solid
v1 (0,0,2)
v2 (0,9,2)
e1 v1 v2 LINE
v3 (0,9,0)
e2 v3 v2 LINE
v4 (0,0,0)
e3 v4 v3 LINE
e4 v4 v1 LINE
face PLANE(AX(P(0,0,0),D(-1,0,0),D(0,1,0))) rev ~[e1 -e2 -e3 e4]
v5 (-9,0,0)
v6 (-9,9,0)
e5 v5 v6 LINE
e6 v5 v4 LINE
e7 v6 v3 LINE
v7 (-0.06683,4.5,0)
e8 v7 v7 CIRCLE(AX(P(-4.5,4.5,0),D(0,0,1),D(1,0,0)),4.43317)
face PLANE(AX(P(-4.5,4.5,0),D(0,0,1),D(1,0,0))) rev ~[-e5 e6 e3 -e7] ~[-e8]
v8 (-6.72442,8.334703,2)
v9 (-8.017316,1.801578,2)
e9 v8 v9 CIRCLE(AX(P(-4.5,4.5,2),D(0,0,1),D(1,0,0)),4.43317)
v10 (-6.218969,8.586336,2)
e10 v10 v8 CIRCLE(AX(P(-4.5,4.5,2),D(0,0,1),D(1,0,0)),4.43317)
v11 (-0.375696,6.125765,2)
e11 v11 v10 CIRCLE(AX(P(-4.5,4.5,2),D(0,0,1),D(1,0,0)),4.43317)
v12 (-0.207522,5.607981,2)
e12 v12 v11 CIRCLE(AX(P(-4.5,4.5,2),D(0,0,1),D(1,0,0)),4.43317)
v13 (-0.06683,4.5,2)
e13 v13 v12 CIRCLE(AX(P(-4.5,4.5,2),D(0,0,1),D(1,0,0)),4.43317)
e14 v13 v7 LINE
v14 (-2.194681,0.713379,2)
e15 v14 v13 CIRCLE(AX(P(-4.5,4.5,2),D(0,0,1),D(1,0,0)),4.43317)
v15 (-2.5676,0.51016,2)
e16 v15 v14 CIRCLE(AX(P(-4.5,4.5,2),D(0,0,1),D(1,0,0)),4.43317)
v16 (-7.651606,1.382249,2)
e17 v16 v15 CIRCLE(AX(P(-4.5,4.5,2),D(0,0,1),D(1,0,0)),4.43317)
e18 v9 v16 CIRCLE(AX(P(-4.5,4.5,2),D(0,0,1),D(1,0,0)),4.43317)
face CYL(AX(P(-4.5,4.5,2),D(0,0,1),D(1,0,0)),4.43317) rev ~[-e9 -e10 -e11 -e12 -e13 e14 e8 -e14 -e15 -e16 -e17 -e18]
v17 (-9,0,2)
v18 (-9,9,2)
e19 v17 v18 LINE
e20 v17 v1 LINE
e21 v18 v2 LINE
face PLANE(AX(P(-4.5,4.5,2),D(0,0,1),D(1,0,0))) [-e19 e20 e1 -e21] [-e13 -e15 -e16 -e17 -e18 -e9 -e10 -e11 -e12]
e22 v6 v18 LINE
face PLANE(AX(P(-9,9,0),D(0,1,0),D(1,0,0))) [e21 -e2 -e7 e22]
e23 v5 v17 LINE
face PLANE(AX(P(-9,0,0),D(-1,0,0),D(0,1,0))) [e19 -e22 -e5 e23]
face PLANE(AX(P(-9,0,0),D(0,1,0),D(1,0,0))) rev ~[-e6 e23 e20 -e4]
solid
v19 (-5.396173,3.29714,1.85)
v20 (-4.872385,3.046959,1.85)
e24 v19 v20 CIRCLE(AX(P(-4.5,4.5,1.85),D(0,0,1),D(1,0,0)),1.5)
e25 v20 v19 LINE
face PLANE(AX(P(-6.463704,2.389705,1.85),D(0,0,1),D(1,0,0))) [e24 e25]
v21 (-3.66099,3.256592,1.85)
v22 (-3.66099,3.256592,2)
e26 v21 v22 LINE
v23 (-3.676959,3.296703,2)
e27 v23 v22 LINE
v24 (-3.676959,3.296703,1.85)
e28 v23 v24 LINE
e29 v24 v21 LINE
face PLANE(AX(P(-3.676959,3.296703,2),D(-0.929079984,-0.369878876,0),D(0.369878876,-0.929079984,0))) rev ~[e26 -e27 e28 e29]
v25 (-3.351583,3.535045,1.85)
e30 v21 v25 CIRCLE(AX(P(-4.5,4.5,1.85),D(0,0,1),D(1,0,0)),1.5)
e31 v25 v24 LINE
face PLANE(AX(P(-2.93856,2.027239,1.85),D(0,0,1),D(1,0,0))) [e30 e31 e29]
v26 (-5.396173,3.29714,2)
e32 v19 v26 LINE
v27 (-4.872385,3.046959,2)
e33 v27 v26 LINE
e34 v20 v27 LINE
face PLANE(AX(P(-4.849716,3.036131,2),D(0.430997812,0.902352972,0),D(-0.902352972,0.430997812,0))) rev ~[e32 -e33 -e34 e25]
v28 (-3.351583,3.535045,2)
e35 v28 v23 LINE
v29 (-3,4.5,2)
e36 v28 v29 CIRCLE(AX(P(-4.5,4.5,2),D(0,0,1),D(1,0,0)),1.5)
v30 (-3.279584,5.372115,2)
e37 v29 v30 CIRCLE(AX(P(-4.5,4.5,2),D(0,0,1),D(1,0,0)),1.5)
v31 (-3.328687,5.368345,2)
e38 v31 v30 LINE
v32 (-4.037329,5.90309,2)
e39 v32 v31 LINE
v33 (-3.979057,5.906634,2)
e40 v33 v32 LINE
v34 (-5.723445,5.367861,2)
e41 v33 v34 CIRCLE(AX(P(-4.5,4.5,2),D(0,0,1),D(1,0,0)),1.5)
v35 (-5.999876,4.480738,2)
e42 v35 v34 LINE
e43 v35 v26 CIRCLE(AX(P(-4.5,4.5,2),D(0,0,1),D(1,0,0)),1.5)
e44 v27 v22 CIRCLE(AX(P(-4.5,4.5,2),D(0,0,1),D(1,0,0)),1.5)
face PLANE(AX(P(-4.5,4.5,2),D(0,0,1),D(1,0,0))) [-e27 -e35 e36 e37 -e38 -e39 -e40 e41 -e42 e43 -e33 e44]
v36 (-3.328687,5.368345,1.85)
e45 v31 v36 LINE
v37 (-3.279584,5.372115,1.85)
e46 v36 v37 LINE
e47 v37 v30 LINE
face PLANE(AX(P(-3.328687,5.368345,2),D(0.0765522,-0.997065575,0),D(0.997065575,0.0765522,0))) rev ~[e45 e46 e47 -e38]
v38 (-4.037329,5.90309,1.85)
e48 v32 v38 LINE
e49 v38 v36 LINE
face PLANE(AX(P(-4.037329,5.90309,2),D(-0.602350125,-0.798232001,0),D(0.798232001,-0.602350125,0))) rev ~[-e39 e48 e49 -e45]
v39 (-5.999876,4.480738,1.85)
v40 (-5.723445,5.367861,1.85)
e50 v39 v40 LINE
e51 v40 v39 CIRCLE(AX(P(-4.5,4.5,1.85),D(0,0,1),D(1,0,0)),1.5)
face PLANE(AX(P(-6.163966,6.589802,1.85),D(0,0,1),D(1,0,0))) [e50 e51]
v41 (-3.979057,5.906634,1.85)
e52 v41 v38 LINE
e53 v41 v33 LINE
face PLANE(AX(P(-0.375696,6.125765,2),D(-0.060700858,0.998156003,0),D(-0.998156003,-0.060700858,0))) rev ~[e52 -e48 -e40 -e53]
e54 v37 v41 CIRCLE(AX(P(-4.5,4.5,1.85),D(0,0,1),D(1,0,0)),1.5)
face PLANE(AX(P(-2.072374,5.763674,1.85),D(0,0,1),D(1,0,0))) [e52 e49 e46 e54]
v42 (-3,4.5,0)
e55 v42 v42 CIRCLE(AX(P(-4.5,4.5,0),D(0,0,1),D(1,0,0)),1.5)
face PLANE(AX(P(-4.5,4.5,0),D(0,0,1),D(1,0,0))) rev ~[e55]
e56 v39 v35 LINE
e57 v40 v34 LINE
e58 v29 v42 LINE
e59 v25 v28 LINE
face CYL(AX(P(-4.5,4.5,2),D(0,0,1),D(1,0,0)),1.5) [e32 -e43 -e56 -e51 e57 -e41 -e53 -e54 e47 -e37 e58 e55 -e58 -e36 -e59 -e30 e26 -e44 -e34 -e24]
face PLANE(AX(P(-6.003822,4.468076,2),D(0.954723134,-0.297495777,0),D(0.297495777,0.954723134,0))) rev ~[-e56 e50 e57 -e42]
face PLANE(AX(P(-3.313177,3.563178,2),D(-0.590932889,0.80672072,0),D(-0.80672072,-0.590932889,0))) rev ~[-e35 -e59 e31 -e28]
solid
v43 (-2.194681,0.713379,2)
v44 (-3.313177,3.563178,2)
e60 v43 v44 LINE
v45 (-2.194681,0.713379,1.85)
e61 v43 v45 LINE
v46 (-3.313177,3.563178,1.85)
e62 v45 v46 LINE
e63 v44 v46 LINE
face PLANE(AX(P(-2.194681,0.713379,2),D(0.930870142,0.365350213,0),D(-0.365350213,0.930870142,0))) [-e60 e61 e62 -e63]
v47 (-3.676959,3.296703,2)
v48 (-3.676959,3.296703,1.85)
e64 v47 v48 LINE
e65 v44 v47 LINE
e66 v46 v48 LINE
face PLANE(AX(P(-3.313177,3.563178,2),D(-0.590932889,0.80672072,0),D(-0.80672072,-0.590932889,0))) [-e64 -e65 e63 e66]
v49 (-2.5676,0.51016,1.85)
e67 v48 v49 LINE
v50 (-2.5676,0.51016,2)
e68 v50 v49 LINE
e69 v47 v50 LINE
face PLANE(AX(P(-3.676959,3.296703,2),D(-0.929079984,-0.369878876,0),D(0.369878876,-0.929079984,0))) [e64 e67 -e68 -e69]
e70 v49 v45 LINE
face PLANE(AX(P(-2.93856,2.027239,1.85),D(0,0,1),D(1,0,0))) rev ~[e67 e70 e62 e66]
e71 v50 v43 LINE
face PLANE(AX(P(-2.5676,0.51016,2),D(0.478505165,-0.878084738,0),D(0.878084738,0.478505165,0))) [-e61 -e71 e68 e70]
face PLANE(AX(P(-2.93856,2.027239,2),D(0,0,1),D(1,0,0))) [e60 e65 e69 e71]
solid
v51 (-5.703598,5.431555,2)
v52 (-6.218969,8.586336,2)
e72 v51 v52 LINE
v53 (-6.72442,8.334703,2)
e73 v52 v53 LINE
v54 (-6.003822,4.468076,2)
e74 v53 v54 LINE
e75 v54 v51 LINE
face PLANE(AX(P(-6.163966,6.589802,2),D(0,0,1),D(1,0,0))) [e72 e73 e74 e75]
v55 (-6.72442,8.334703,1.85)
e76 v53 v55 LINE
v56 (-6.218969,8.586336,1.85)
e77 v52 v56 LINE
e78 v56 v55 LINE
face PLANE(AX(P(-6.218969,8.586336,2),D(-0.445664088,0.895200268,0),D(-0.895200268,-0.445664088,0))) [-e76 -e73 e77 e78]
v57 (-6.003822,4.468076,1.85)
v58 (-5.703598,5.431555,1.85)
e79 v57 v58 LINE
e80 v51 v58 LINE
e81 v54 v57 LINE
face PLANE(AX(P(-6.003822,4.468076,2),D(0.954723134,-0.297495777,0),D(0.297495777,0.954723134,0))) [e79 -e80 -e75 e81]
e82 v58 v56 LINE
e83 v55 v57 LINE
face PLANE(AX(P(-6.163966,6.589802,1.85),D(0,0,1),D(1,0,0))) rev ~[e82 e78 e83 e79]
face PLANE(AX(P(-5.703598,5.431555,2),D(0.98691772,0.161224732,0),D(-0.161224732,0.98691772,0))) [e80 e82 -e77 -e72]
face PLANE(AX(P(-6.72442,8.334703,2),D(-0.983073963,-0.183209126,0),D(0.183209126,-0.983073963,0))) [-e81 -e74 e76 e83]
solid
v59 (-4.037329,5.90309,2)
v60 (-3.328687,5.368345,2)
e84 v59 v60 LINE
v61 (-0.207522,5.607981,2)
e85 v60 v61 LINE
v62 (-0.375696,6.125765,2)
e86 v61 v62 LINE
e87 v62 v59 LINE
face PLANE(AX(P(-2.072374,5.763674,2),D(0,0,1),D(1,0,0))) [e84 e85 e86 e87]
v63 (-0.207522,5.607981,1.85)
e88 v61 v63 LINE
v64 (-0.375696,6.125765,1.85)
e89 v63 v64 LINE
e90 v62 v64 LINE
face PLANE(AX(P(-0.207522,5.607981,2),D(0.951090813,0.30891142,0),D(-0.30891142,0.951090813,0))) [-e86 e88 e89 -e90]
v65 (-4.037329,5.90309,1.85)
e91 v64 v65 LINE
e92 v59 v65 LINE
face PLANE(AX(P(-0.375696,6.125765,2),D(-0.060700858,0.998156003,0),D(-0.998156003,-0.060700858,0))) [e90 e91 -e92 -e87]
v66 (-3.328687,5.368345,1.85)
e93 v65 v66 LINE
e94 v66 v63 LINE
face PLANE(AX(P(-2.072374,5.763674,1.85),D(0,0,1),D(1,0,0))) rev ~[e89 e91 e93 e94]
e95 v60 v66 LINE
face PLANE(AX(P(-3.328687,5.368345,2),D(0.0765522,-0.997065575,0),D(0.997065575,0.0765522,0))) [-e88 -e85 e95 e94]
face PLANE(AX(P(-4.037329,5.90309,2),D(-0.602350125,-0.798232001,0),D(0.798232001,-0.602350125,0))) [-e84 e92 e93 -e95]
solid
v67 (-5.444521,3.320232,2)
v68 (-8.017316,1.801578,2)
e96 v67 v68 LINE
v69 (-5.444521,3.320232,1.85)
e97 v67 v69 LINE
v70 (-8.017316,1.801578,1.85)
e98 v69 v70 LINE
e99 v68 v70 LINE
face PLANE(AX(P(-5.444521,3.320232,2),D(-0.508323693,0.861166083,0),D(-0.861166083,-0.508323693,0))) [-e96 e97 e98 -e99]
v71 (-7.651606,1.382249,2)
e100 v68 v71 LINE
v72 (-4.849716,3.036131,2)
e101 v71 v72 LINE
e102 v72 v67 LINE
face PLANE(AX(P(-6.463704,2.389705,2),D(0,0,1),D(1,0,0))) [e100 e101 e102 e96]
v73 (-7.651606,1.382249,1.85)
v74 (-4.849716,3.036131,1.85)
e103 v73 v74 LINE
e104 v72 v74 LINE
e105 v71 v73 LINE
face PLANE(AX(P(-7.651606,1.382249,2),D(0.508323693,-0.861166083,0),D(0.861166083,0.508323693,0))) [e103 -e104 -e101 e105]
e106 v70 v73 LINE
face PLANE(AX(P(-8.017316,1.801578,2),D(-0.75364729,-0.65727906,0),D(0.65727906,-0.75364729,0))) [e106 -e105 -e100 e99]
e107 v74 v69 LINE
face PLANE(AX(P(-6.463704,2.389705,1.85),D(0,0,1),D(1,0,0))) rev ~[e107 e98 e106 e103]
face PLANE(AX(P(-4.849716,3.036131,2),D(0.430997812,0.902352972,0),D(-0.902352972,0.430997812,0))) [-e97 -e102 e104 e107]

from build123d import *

# Parameters (mm, degrees)
F0_W     = 9
F0_H     = 9
F1_DEPTH = 2
F2_R     = 4.43316962
F2_R_2   = 1.5
F3_DEPTH = 3
F5_DEPTH = 0.15
F6_DEPTH = 0.15


# Not quite as in the source:
# - a feature of the source that left no trace in its solid (it failed there, or was rolled back) is left out
# - the program builds the solid bodies; features that only make, move or delete a surface that nothing else refers to are left out


with BuildPart() as f1:
    # F0 (on Top) → F1 (new body)
    with BuildSketch(Plane.XY):
        with Locations((-4.5, 4.5)):
            Rectangle(F0_W, F0_H)
    extrude(amount=F1_DEPTH)

    # F2 (on face) → F3 (cut)
    with BuildSketch(Plane.XY.offset(2)):
        with Locations((-4.5, 4.5)):
            Circle(F2_R)
        with Locations((-4.5, 4.5)):
            Circle(F2_R_2, mode=Mode.SUBTRACT)
    extrude(amount=-F3_DEPTH, mode=Mode.SUBTRACT)

    # F4 (on face) → F5 (cut)
    with BuildSketch(Plane.XY.offset(2)):
        Polygon((-6.7244199271, 8.3347032307), (-6.0038217343, 4.4680763967), (-5.7035977952, 5.4315547459), (-6.2189687337, 8.5863356901), align=None)
        Polygon((-0.3756961864, 6.1257647226), (-4.0373285301, 5.9030898847), (-3.3286872786, 5.3683454171), (-0.2075215072, 5.6079807167), align=None)
        Polygon((-4.849715769, 3.0361308041), (-5.4445206188, 3.3202320337), (-8.017316279, 1.8015784108), (-7.6516059208, 1.3822487271), align=None)
        Polygon((-3.3131770324, 3.5631777719), (-3.6769588478, 3.2967031002), (-2.5675997073, 0.510160155), (-2.1946810339, 0.7133791655), align=None)
    extrude(amount=-F5_DEPTH, mode=Mode.SUBTRACT)


with BuildPart() as f6:
    # F4 (on face) → F6 (new body)
    with BuildSketch(Plane.XY.offset(2)):
        Polygon((-6.7244199271, 8.3347032307), (-6.0038217343, 4.4680763967), (-5.7035977952, 5.4315547459), (-6.2189687337, 8.5863356901), align=None)
    extrude(amount=-F6_DEPTH)


with BuildPart() as f6b:
    # F4 (on face) → F6, piece 2 (new body)
    with BuildSketch(Plane.XY.offset(2)):
        Polygon((-0.3756961864, 6.1257647226), (-4.0373285301, 5.9030898847), (-3.3286872786, 5.3683454171), (-0.2075215072, 5.6079807167), align=None)
    extrude(amount=-F6_DEPTH)


with BuildPart() as f6c:
    # F4 (on face) → F6, piece 3 (new body)
    with BuildSketch(Plane.XY.offset(2)):
        Polygon((-4.849715769, 3.0361308041), (-5.4445206188, 3.3202320337), (-8.017316279, 1.8015784108), (-7.6516059208, 1.3822487271), align=None)
    extrude(amount=-F6_DEPTH)


with BuildPart() as f6d:
    # F4 (on face) → F6, piece 4 (new body)
    with BuildSketch(Plane.XY.offset(2)):
        Polygon((-3.3131770324, 3.5631777719), (-3.6769588478, 3.2967031002), (-2.5675997073, 0.510160155), (-2.1946810339, 0.7133791655), align=None)
    extrude(amount=-F6_DEPTH)


solid = Compound([f1.part, f6.part, f6b.part, f6c.part, f6d.part])
